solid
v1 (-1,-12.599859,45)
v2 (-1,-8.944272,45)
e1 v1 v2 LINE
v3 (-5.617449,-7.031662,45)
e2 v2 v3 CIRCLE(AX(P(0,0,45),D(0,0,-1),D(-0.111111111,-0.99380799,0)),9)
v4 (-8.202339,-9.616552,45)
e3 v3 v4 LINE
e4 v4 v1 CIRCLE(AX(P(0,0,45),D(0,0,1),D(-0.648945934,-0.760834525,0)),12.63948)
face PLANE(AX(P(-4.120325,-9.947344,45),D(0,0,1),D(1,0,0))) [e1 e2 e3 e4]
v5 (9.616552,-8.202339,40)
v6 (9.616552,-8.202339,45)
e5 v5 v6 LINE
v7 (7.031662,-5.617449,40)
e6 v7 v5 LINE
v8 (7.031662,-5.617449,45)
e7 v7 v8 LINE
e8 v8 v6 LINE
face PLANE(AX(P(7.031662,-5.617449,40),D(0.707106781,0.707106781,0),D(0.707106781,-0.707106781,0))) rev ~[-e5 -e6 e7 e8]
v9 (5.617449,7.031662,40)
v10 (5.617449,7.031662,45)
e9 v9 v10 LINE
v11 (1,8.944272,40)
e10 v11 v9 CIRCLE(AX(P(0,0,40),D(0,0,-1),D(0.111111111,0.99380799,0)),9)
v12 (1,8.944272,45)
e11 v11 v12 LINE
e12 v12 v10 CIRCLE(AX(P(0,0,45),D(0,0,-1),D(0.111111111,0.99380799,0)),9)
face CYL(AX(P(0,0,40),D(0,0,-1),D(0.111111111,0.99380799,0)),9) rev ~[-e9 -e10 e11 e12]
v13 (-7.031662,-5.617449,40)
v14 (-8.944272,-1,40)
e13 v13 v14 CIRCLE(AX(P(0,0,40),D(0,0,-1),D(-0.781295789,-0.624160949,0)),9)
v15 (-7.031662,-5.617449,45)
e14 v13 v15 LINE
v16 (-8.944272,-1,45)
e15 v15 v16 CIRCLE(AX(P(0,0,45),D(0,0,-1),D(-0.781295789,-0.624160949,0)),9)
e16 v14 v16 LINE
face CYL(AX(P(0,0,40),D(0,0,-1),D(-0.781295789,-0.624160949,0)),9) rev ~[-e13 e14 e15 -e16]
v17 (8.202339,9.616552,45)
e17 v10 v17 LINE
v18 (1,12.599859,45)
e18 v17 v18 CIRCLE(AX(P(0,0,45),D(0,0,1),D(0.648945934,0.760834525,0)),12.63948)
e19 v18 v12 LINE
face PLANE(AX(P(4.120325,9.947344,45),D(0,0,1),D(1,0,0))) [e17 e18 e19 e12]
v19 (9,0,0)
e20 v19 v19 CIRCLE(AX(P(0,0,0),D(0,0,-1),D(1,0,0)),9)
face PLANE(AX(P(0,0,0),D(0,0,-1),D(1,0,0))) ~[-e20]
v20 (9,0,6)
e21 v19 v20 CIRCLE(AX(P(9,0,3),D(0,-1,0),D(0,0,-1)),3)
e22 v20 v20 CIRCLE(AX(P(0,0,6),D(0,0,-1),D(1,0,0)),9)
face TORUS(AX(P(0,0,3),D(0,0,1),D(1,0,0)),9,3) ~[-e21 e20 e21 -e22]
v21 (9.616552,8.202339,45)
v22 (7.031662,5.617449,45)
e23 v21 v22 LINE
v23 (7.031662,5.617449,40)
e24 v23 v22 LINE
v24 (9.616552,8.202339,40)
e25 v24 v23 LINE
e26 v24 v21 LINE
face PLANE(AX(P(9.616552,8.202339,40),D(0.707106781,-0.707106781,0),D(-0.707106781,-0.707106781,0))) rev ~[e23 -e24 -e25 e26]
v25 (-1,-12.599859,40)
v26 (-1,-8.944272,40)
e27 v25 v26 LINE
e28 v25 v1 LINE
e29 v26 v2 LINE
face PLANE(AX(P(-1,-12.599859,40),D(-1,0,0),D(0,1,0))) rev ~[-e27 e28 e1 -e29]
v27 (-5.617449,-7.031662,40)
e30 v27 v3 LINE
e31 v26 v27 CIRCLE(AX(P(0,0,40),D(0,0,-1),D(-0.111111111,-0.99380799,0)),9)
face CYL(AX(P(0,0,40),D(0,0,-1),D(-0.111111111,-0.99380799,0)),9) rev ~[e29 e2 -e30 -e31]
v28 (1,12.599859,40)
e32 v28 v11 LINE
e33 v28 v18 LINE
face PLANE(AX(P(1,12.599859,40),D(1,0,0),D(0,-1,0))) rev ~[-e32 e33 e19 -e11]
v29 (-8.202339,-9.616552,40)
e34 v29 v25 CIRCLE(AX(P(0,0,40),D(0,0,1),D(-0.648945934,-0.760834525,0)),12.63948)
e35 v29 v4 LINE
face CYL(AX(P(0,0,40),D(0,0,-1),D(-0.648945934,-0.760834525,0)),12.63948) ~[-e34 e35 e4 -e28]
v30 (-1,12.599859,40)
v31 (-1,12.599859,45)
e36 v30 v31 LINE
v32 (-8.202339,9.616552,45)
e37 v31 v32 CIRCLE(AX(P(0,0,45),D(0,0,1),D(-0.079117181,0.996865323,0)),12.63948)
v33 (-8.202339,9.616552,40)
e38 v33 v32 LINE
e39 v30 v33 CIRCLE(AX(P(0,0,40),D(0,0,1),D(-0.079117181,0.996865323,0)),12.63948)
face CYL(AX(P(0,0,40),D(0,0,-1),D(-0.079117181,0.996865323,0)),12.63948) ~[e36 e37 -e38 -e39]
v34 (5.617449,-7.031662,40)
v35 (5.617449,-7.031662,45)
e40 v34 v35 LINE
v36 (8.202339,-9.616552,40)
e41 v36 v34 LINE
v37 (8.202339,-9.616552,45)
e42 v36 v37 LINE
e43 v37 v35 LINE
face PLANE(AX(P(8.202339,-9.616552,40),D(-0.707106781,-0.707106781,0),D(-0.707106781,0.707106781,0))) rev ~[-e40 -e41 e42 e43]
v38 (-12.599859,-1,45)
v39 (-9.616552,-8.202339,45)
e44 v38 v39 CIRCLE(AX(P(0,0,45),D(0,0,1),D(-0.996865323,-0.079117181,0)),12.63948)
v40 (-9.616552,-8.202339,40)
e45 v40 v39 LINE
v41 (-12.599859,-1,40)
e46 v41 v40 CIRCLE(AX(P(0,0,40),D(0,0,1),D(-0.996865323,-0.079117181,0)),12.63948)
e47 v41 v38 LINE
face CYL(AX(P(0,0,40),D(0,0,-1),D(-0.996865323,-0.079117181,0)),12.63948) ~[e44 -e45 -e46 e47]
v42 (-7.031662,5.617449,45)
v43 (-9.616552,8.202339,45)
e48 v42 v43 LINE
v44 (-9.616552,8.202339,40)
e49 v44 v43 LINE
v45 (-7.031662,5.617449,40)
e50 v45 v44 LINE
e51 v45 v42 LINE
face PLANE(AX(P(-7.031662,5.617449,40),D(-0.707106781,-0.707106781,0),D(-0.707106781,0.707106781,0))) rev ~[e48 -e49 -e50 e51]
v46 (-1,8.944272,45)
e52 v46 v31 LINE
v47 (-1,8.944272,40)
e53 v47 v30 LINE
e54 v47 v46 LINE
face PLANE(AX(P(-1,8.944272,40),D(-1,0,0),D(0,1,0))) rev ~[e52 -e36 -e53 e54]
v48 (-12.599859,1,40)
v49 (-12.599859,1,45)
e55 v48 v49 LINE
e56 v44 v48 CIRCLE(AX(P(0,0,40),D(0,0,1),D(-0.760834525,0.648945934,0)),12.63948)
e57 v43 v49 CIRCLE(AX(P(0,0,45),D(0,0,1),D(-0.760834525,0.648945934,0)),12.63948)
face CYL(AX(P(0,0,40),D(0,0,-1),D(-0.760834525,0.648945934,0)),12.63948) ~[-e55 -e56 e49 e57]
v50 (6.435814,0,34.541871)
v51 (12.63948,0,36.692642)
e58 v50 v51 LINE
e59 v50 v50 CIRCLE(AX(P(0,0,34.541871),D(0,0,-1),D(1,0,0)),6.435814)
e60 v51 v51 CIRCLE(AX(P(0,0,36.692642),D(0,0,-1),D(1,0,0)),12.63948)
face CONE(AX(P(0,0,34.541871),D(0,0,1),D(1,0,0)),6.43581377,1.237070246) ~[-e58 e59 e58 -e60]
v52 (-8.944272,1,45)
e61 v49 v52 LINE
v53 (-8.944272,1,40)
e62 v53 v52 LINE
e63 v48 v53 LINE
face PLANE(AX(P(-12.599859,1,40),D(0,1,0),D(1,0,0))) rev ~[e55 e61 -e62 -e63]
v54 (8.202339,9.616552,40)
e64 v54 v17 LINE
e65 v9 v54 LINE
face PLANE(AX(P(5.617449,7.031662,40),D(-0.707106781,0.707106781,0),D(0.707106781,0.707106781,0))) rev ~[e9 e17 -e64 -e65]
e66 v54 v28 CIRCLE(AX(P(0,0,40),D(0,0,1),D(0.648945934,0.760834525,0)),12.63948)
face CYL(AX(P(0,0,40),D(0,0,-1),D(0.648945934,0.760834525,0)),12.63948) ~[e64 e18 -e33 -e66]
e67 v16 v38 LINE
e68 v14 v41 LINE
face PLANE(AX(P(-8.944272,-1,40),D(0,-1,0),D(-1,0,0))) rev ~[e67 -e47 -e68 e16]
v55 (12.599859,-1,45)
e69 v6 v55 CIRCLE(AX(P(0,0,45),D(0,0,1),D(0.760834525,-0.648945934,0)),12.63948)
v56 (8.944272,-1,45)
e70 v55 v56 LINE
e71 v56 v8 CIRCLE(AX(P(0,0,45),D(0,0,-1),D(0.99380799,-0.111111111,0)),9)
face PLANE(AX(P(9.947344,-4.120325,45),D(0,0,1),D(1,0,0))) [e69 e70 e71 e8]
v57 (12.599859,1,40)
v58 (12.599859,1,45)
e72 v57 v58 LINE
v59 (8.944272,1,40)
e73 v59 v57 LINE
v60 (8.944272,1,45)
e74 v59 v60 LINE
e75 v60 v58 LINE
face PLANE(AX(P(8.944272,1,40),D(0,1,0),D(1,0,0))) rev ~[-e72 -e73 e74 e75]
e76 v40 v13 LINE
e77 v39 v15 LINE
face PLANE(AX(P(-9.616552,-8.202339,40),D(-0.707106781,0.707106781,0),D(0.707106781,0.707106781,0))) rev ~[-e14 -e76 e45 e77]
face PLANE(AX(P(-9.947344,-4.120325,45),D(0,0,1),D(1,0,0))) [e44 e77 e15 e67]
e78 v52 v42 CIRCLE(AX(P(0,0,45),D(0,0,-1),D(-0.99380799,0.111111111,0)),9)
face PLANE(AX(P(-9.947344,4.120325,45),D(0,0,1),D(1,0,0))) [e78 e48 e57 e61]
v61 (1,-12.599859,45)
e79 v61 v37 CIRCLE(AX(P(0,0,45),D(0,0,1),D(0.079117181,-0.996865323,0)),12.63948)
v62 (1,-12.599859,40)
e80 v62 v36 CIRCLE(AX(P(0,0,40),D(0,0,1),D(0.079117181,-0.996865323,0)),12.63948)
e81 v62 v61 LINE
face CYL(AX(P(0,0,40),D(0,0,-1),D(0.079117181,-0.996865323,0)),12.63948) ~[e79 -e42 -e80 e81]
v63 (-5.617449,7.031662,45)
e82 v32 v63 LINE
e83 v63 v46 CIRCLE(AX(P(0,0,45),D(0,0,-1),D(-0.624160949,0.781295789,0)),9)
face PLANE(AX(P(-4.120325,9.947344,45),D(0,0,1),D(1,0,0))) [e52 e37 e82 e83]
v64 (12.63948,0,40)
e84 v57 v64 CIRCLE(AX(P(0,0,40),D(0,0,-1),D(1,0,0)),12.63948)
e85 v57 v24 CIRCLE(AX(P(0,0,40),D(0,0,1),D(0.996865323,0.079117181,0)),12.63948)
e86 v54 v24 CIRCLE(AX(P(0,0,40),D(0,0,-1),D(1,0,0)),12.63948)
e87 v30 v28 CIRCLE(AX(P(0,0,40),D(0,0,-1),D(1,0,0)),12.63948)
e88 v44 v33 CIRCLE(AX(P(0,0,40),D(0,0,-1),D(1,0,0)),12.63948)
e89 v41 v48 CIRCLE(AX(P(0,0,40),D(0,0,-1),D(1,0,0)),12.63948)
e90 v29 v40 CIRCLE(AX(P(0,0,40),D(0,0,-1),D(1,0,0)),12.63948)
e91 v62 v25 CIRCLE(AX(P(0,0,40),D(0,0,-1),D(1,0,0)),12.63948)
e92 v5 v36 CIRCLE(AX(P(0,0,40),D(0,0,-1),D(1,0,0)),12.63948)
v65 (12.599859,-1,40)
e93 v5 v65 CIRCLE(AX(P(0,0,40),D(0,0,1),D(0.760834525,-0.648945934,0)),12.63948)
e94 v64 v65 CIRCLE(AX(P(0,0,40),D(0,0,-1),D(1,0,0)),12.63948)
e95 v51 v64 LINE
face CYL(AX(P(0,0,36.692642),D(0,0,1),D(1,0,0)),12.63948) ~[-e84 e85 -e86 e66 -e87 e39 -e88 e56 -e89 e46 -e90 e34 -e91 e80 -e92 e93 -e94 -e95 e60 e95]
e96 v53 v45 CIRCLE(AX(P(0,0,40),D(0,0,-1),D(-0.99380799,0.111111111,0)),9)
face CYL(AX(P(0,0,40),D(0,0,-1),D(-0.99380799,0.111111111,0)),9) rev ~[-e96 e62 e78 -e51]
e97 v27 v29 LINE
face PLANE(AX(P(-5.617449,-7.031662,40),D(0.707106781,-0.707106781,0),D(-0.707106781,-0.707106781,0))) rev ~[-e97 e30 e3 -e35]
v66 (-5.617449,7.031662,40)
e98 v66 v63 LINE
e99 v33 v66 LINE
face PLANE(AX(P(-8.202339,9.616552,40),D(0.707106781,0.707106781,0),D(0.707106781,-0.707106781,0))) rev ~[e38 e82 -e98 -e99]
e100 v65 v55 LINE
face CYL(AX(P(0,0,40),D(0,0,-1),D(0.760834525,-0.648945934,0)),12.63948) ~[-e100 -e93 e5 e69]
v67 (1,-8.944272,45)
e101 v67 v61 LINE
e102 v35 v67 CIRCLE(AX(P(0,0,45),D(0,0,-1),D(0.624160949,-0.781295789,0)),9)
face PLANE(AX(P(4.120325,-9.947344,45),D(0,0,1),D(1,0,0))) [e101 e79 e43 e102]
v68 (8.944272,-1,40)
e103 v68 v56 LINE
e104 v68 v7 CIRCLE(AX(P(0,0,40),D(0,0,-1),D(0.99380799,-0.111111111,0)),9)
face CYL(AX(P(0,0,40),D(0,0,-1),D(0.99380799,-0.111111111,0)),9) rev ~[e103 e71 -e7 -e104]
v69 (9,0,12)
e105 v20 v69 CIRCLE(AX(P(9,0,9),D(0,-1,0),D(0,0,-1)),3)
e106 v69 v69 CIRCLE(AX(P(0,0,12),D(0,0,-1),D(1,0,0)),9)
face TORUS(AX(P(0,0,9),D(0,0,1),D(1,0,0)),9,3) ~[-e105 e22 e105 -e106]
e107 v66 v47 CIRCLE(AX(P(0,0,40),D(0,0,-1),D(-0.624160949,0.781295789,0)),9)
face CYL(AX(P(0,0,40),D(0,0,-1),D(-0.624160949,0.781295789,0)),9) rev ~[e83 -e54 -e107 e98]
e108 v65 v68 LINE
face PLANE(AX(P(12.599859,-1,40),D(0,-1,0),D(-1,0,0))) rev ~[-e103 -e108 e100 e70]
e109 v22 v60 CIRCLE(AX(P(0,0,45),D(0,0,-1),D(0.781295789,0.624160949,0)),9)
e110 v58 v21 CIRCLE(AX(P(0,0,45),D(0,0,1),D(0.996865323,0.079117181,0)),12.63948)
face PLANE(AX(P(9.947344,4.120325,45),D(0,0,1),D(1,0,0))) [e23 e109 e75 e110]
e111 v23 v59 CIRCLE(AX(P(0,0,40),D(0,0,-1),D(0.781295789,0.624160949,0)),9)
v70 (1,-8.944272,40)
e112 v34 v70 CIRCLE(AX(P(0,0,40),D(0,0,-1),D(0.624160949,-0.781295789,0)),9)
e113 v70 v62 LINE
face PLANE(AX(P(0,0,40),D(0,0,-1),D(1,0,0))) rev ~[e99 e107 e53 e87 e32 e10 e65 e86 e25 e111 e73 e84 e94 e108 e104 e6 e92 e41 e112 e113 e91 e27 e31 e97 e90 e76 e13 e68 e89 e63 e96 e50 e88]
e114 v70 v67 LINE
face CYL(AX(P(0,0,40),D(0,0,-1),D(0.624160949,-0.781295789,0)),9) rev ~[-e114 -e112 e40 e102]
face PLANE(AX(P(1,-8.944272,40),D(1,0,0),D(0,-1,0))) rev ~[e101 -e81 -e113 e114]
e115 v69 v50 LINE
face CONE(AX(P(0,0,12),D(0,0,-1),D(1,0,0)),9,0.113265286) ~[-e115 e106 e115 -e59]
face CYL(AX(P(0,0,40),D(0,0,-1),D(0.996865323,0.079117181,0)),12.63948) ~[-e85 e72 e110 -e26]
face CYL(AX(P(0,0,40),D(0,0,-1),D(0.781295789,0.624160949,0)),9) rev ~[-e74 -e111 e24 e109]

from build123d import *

# Parameters (mm, degrees)
F3_DEPTH = 5


# Not quite as in the source:
# - after a boolean that leaves OpenCascade's solid faulty, fix() repairs it


with BuildPart() as f1:
    # F0 (on Front) → F1 (revolve)
    with BuildSketch(Plane.XZ):
        with BuildLine():
            Line((0, 40), (0, 0))
            Line((0, 0), (9, 0))
            ThreePointArc((9, 0), (12, 3), (9, 6))
            ThreePointArc((9, 6), (12, 9), (9, 12))
            Line((9, 12), (6.4358137697, 34.5418713987))
            Line((6.4358137697, 34.5418713987), (12.6394796214, 36.6926416755))
            Line((12.6394796214, 36.6926416755), (12.6394796214, 40))
            Line((12.6394796214, 40), (0, 40))
        make_face()
    revolve(axis=Axis((0, 0, 20), (0, 0, -1)))

    # F2 (on face) → F3 (join)
    with BuildSketch(Plane.XY.offset(40)):
        with BuildLine():
            ThreePointArc((-8.94427191, 1), (-8.3149157926, 3.4441508913), (-7.0316621015, 5.6174485392))
            Line((-7.0316621015, 5.6174485392), (-9.6165524738, 8.2023389114))
            ThreePointArc((-9.6165524738, 8.2023389114), (-11.6773565238, 4.8369194448), (-12.5998589317, 1))
            Line((-12.5998589317, 1), (-8.94427191, 1))
        make_face()
        with BuildLine():
            ThreePointArc((-1, 12.5998589317), (-4.8369194448, 11.6773565238), (-8.2023389114, 9.6165524738))
            Line((-8.2023389114, 9.6165524738), (-5.6174485392, 7.0316621015))
            ThreePointArc((-5.6174485392, 7.0316621015), (-3.4441508913, 8.3149157926), (-1, 8.94427191))
            Line((-1, 8.94427191), (-1, 12.5998589317))
        make_face()
        with BuildLine():
            ThreePointArc((8.2023389114, 9.6165524738), (4.8369194448, 11.6773565238), (1, 12.5998589317))
            Line((1, 12.5998589317), (1, 8.94427191))
            ThreePointArc((1, 8.94427191), (3.4441508913, 8.3149157926), (5.6174485392, 7.0316621015))
            Line((5.6174485392, 7.0316621015), (8.2023389114, 9.6165524738))
        make_face()
        with BuildLine():
            ThreePointArc((12.5998589317, 1), (11.6773565238, 4.8369194448), (9.6165524738, 8.2023389114))
            Line((9.6165524738, 8.2023389114), (7.0316621015, 5.6174485392))
            ThreePointArc((7.0316621015, 5.6174485392), (8.3149157926, 3.4441508913), (8.94427191, 1))
            Line((8.94427191, 1), (12.5998589317, 1))
        make_face()
        with BuildLine():
            Line((7.0316621015, -5.6174485392), (9.6165524738, -8.2023389114))
            ThreePointArc((9.6165524738, -8.2023389114), (11.6773565238, -4.8369194448), (12.5998589317, -1))
            Line((12.5998589317, -1), (8.94427191, -1))
            ThreePointArc((8.94427191, -1), (8.3149157926, -3.4441508913), (7.0316621015, -5.6174485392))
        make_face()
        with BuildLine():
            Line((1, -8.94427191), (1, -12.5998589317))
            ThreePointArc((1, -12.5998589317), (4.8369194448, -11.6773565238), (8.2023389114, -9.6165524738))
            Line((8.2023389114, -9.6165524738), (5.6174485392, -7.0316621015))
            ThreePointArc((5.6174485392, -7.0316621015), (3.4441508913, -8.3149157926), (1, -8.94427191))
        make_face()
        with BuildLine():
            Line((-5.6174485392, -7.0316621015), (-8.2023389114, -9.6165524738))
            ThreePointArc((-8.2023389114, -9.6165524738), (-4.8369194448, -11.6773565238), (-1, -12.5998589317))
            Line((-1, -12.5998589317), (-1, -8.94427191))
            ThreePointArc((-1, -8.94427191), (-3.4441508913, -8.3149157926), (-5.6174485392, -7.0316621015))
        make_face()
        with BuildLine():
            Line((-8.94427191, -1), (-12.5998589317, -1))
            ThreePointArc((-12.5998589317, -1), (-11.6773565238, -4.8369194448), (-9.6165524738, -8.2023389114))
            Line((-9.6165524738, -8.2023389114), (-7.0316621015, -5.6174485392))
            ThreePointArc((-7.0316621015, -5.6174485392), (-8.3149157926, -3.4441508913), (-8.94427191, -1))
        make_face()
    extrude(amount=F3_DEPTH)

    add(f1.part.fix(), mode=Mode.REPLACE)


solid = f1.part
